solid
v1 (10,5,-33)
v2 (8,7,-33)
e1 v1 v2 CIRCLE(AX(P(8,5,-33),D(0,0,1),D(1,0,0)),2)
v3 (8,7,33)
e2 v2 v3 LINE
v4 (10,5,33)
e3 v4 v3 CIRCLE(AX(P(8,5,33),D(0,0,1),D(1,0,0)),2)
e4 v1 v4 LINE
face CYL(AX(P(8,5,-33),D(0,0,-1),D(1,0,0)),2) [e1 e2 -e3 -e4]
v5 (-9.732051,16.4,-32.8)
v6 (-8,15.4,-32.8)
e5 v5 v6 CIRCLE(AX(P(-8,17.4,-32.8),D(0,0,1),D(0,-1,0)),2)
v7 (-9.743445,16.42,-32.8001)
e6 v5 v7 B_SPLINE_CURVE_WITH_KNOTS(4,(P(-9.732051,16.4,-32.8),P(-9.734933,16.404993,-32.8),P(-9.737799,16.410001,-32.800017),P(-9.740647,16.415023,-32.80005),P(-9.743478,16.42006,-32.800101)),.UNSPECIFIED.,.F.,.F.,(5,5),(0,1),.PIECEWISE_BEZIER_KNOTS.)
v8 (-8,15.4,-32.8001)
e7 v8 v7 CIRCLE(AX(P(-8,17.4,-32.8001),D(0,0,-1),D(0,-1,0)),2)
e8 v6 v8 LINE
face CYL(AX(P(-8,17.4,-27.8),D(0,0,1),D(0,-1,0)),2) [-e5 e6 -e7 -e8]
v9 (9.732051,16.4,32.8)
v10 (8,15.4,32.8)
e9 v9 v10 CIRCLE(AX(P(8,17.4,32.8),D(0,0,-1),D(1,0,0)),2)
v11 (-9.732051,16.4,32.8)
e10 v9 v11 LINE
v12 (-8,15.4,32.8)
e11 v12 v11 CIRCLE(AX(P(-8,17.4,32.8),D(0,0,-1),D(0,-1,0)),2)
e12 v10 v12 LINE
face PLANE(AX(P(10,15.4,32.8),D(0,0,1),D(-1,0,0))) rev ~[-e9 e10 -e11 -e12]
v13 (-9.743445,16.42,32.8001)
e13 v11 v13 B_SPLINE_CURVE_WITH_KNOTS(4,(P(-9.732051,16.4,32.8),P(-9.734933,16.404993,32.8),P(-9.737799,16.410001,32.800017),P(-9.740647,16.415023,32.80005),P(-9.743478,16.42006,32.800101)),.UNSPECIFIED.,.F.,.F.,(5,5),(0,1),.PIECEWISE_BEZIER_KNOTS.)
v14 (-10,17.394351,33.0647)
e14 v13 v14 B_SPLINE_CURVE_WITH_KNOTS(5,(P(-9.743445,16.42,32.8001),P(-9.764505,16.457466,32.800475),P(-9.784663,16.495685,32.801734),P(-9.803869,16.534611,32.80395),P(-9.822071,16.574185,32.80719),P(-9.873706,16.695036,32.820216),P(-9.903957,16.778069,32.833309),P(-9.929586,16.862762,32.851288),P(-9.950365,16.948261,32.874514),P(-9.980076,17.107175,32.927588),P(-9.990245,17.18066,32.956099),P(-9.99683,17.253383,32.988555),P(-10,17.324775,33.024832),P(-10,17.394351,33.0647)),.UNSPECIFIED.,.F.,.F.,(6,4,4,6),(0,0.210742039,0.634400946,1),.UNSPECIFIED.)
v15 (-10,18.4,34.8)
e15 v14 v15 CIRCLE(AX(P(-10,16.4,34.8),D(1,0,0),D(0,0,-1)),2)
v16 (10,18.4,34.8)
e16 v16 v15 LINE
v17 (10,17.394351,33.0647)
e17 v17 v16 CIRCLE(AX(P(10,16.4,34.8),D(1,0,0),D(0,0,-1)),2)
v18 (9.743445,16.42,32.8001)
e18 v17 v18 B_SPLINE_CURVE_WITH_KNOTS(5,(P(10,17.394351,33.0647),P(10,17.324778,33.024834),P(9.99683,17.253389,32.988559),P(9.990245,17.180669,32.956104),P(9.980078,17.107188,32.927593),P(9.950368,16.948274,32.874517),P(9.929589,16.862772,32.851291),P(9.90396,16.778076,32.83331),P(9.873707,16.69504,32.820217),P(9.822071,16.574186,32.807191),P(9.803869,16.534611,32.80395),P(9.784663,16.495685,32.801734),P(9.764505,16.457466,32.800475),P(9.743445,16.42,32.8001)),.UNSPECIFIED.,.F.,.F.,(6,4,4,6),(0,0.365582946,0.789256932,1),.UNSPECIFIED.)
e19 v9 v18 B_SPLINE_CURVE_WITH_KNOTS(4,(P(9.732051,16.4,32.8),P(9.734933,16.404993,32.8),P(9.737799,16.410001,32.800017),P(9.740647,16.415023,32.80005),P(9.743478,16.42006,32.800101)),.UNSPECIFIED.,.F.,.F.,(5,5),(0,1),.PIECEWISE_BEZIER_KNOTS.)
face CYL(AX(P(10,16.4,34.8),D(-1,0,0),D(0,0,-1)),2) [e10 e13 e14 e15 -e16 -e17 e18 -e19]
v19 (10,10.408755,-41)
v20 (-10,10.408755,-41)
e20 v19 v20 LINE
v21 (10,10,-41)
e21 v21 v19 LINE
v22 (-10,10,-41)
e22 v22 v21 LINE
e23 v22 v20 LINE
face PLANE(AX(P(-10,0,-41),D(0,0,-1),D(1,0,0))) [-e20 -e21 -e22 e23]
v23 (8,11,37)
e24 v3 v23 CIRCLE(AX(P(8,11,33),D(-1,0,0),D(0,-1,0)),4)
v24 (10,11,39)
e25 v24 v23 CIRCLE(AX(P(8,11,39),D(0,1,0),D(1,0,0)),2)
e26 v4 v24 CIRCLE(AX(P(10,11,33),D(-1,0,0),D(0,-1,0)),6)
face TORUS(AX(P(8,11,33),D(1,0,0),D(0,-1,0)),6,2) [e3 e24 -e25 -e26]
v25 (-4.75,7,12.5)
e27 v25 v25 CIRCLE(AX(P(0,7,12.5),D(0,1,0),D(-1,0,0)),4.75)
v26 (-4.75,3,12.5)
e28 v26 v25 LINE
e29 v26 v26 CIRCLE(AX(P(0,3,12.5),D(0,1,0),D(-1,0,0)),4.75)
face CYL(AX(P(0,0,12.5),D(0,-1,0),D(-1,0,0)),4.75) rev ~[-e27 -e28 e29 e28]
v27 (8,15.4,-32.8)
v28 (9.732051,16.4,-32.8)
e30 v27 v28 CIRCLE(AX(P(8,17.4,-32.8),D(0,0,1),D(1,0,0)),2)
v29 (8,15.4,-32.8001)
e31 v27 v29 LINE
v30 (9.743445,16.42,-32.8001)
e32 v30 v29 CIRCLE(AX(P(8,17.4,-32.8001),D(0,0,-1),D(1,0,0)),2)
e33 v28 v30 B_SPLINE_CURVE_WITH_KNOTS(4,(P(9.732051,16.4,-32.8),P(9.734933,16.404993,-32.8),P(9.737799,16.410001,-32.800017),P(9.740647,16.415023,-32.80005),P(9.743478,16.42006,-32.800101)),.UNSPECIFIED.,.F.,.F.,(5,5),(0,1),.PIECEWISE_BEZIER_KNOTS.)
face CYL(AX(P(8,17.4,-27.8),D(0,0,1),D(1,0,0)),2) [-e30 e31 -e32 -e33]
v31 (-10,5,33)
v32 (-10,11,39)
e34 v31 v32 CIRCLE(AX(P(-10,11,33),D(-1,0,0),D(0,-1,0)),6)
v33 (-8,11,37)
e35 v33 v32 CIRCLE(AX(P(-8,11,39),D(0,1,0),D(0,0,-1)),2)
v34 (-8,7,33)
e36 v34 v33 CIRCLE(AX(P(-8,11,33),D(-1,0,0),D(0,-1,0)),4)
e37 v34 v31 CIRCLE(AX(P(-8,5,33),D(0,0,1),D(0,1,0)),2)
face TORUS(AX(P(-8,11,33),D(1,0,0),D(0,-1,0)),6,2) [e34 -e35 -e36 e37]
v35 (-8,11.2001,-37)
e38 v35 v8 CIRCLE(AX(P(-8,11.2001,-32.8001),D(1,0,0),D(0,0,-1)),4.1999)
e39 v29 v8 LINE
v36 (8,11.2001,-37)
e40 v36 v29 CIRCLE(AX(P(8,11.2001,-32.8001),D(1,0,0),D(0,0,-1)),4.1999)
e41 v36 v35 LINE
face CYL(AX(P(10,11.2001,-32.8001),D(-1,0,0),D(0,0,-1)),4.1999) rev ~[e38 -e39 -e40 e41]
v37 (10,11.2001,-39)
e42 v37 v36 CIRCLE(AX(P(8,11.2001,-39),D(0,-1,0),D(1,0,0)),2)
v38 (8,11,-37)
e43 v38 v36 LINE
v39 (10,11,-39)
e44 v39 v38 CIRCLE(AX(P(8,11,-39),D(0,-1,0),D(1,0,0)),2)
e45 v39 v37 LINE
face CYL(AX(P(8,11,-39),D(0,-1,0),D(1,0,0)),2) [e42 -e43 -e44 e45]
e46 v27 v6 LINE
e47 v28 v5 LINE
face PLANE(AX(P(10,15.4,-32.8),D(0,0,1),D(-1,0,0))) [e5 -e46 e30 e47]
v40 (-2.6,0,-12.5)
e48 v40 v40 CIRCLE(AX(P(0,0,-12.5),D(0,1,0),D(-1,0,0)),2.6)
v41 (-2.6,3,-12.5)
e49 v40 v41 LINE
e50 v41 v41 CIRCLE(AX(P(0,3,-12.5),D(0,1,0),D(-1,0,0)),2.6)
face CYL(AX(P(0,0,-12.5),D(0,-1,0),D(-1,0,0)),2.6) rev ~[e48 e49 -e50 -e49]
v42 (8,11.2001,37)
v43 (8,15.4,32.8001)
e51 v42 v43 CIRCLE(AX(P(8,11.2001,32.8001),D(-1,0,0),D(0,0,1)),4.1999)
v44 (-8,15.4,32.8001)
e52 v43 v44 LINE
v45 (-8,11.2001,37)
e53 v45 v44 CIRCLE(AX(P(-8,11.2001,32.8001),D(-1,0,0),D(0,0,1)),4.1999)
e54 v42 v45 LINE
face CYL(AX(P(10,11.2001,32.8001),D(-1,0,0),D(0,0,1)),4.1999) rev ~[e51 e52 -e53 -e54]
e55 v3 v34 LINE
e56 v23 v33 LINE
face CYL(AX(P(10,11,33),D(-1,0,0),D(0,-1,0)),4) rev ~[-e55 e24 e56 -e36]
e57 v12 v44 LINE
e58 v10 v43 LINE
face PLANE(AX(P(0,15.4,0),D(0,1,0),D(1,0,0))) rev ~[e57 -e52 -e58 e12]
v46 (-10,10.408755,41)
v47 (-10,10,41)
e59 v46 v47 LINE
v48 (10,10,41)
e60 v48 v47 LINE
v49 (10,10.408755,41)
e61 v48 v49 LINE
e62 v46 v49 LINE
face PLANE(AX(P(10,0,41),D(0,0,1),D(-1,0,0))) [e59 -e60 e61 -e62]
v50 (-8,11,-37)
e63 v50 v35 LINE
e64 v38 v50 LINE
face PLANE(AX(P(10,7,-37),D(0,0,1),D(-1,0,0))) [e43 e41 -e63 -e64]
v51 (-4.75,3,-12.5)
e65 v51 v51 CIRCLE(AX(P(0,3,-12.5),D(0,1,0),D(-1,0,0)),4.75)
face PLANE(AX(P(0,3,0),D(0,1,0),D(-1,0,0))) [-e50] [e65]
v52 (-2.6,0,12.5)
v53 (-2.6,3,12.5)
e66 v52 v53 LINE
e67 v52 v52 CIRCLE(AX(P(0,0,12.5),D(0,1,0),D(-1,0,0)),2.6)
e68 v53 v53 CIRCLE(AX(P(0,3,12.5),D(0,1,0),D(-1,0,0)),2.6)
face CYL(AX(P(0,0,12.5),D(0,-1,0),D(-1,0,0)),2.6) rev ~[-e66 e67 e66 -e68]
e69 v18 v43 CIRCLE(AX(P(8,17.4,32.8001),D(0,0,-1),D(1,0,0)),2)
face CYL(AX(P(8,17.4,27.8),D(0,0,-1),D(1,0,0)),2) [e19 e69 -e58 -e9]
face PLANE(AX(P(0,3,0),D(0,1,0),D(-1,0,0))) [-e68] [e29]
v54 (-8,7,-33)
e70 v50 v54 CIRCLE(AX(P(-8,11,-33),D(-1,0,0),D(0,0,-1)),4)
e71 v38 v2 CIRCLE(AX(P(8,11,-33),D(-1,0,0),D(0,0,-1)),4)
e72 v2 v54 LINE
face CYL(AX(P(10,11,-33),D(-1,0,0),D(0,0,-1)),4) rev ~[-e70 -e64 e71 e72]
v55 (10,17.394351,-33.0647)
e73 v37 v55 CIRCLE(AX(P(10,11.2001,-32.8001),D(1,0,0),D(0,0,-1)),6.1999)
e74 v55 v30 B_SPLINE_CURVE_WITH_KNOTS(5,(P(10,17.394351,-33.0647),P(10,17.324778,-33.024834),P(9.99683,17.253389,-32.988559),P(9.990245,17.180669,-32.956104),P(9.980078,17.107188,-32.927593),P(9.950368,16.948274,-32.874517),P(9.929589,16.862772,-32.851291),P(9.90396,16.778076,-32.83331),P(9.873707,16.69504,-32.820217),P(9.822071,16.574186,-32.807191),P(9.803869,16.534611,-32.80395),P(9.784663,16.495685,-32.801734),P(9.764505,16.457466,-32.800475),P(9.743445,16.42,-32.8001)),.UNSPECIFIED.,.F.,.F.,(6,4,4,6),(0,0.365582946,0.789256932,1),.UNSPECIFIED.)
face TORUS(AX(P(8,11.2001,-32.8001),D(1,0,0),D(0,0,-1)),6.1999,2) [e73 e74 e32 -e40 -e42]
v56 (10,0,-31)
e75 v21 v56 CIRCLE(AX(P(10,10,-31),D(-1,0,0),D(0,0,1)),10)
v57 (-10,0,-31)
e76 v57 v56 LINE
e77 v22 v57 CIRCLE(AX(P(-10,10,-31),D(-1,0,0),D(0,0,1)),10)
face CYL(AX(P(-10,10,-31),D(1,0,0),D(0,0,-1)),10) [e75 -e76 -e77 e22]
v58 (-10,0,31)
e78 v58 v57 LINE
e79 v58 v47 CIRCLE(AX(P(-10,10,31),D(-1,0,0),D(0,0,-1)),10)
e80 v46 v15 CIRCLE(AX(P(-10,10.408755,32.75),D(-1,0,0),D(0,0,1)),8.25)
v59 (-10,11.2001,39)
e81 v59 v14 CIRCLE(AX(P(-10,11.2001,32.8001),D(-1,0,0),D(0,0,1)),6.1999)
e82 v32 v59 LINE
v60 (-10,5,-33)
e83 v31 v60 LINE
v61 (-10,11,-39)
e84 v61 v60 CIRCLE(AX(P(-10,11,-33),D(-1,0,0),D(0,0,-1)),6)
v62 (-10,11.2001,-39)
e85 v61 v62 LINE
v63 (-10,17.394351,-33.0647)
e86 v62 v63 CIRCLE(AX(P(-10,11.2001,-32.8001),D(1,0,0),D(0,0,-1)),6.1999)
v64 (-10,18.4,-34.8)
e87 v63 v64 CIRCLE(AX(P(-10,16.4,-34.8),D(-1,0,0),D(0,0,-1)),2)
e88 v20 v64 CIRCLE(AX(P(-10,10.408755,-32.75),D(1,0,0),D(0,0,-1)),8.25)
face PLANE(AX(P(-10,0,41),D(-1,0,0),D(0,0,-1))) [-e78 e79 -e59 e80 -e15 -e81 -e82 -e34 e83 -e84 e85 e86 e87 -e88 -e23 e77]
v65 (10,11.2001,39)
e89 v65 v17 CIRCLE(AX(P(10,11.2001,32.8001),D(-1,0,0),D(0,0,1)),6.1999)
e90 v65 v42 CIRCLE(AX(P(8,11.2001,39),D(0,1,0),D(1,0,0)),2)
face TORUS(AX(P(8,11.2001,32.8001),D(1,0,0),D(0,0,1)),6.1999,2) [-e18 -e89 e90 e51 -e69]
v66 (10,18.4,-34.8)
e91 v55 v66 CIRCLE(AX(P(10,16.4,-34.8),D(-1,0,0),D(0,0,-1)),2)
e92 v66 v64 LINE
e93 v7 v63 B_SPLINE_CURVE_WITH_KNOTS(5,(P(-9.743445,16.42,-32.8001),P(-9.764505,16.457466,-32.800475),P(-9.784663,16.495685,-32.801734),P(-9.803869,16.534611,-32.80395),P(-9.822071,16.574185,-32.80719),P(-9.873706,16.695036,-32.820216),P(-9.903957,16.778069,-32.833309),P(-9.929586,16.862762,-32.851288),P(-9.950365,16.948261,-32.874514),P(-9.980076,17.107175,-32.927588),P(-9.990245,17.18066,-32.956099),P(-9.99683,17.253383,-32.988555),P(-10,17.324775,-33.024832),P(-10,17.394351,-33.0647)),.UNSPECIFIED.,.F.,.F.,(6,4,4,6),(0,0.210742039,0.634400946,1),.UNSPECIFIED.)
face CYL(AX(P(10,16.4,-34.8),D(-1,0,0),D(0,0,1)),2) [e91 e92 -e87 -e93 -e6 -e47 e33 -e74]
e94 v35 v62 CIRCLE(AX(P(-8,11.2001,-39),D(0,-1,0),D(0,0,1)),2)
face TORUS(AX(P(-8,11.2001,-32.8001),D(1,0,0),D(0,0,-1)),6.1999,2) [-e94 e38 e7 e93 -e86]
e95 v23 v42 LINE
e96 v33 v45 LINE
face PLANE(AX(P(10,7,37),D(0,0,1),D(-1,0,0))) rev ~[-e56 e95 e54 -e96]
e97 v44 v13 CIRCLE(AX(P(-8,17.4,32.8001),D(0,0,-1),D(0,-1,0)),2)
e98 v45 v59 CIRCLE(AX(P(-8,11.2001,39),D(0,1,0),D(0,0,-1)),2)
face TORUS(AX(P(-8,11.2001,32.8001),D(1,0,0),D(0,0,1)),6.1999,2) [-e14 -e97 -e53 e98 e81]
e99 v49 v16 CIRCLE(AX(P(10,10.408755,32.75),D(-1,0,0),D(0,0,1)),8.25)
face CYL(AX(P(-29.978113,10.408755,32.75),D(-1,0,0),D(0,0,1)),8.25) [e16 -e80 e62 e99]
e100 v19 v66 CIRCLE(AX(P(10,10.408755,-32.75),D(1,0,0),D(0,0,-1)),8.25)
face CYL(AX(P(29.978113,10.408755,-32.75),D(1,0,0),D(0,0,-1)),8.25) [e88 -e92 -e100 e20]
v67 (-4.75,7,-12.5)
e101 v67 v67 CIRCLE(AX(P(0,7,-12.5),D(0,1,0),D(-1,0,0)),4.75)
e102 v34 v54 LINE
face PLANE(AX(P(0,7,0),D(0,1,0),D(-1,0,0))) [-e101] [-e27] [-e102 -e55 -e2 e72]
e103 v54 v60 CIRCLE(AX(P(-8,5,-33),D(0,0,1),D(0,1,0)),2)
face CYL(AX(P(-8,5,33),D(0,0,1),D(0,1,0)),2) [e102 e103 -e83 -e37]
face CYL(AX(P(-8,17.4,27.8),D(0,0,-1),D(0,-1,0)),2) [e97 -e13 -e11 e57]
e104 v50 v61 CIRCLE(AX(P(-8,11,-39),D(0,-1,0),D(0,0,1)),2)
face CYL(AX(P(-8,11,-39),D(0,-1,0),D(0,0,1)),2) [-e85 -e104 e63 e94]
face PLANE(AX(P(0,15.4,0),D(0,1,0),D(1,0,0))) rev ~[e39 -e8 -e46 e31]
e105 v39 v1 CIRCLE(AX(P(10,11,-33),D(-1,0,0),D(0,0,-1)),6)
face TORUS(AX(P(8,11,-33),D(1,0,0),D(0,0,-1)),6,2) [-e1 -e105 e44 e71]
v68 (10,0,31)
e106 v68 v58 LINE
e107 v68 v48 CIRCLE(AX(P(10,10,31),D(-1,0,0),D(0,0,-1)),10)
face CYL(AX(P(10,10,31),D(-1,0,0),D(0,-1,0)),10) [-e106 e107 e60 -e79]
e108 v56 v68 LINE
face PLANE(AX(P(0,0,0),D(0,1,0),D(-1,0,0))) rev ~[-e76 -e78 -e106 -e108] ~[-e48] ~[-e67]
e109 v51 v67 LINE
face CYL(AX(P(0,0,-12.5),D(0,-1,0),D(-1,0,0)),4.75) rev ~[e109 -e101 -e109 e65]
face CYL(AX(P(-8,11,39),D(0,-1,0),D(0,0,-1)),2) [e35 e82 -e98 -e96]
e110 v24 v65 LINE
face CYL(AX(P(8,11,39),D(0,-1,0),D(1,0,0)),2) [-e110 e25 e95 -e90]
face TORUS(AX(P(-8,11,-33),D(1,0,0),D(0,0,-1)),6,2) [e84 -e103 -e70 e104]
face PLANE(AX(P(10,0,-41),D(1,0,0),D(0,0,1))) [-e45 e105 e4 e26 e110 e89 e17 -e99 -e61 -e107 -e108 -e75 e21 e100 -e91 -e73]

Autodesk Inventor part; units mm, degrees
ref_plane "YZ Plane" through (0, 0, 0) normal (1, 0, 0) x (0, 1, 0)
ref_plane "XZ Plane" through (0, 0, 0) normal (0, 1, 0) x (-1, 0, 0)
ref_plane "XY Plane" through (0, 0, 0) normal (0, 0, 1) x (1, 0, 0)
sketch "Sketch1" plane through (0, 0, 0) normal (0, 1, 0) x (-1, 0, 0)
  circle A0 centre (0, 12.5) radius 2.6
  circle A1 centre (0, -12.5) radius 2.6
  circle A2 centre (0, 12.5) radius 4.75
  circle A3 centre (0, -12.5) radius 4.75
  circle A4 centre (0, 12.5) radius 7.5
  circle A5 centre (0, -12.5) radius 7.5
  line L0 (7.5, 12.5) -> (7.5, -12.5)
  line L1 (-7.5, -12.5) -> (-7.5, 12.5)
  line L2 (0, 12.5) -> (0, -12.5) construction
  line L3 (7.5, -12.5) -> (7.5, 12.5)
  line L4 (-10, 41) -> (10, 41)
  line L5 (10, 41) -> (10, -41)
  line L6 (10, -41) -> (-10, -41)
  line L7 (-10, -41) -> (-10, 41)
  point P0 (0, 0)
  dimension "d0" = 5.2
  dimension "d1" = 5.2
  dimension "d2" = 25
  dimension "d3" = 12.5
  dimension "d6" = 9.5
  dimension "d7" = 9.5
  dimension "d8" = 15
  dimension "d9" = 15
  dimension "d19" = 20
  dimension "d20" = 82
  dimension "d21" = 41
  dimension "d38" = 10
extrude "Extrusion1" add sketch "Sketch1" along normal blind 3 contours A2 | A3
extrude "Extrusion2" add sketch "Sketch1" along normal blind 7 contours A4 | L0 A5 L1 A4 | A5 | L4 L5 L6 L7
sketch "Sketch2" plane through (0, 7, 0) normal (0, 1, 0) x (1, 0, 0)
  circle A0 centre (0, 12.5) radius 4.75 projected
  circle A1 centre (0, -12.5) radius 4.75 projected
  line L0 (-10, -41) -> (10, -41) projected
  line L1 (10, -41) -> (10, 41) projected
  line L2 (10, 41) -> (-10, 41) projected
  line L3 (-10, 41) -> (-10, -41) projected
  line L4 (10, 41) -> (10, -41) projected
  line L5 (10, -37) -> (-10, -37)
  line L6 (10, 37) -> (-10, 37)
  point P0 (0, 0)
  dimension "d24" = 4
  dimension "d25" = 4
extrude "Extrusion3" add sketch "Sketch2" along normal blind 8.4 contours L3 L5 L1 L0 | L3 L2 L1 L6
sketch "Sketch3" plane through (0, 15.4, 0) normal (0, 1, 0) x (1, 0, 0)
  line L0 (10, 41) -> (-10, 41) projected
  line L1 (-10, 41) -> (-10, 37) projected
  line L2 (-10, -41) -> (10, -41) projected
  line L3 (10, 37) -> (10, 41) projected
  line L4 (-10, 37) -> (10, 37) projected
  line L5 (10, -41) -> (10, -37) projected
  line L6 (10, -37) -> (-10, -37) projected
  line L7 (-10, -37) -> (-10, -41) projected
  line L8 (-10, -41) -> (10, -41)
  line L9 (10, -41) -> (10, -32.8)
  line L10 (10, -32.8) -> (-10, -32.8)
  line L11 (-10, -32.8) -> (-10, -41)
  line L12 (10, -37) -> (10, 37) projected
  line L13 (-10, 41) -> (10, 41)
  line L14 (10, 41) -> (10, 32.8)
  line L15 (10, 32.8) -> (-10, 32.8)
  line L16 (-10, 32.8) -> (-10, 41)
  dimension "d39" = 4.2
  dimension "d40" = 4.2
extrude "Extrusion4" add sketch "Sketch3" along normal blind 3
fillet "Fillet4" radius 4 2 edges at (0, 7, 37) (0, 7, -37)
fillet "Fillet5" radius 4.2 2 edges at (0, 15.4, -37) (0, 15.4, 37)
fillet "Fillet6" radius 2 2 edges at (0, 18.4, 32.8) (0, 18.4, -32.8)
fillet "Fillet7" radius 10 2 edges at (0, 0, 41) (0, 0, -41)
fillet "Fillet8" radius 8.25 2 edges at (0, 18.4, 41) (0, 18.4, -41)
fillet "Fillet9" radius 2 14 edges at (10, 8.1716, -35.8284) (10, 11.1, -37) (10, 14.1699, -35.7699) (10, 8.1716, 35.8284) (10, 11.1, 37) (10, 14.1699, 35.7699) (10, 7, 0) (-10, 8.1716, 35.8284) (-10, 11.1, 37) (-10, 14.1699, 35.7699) (-10, 8.1716, -35.8284) (-10, 11.1, -37) (-10, 14.1699, -35.7699) (-10, 7, 0)
equation "\"d3\" = 0.5 * d2"
equation "\"d21\" = 0.5 * d20"
equation "\"d38\" = 0.5 * d19"
properties part number "HolderMid"
